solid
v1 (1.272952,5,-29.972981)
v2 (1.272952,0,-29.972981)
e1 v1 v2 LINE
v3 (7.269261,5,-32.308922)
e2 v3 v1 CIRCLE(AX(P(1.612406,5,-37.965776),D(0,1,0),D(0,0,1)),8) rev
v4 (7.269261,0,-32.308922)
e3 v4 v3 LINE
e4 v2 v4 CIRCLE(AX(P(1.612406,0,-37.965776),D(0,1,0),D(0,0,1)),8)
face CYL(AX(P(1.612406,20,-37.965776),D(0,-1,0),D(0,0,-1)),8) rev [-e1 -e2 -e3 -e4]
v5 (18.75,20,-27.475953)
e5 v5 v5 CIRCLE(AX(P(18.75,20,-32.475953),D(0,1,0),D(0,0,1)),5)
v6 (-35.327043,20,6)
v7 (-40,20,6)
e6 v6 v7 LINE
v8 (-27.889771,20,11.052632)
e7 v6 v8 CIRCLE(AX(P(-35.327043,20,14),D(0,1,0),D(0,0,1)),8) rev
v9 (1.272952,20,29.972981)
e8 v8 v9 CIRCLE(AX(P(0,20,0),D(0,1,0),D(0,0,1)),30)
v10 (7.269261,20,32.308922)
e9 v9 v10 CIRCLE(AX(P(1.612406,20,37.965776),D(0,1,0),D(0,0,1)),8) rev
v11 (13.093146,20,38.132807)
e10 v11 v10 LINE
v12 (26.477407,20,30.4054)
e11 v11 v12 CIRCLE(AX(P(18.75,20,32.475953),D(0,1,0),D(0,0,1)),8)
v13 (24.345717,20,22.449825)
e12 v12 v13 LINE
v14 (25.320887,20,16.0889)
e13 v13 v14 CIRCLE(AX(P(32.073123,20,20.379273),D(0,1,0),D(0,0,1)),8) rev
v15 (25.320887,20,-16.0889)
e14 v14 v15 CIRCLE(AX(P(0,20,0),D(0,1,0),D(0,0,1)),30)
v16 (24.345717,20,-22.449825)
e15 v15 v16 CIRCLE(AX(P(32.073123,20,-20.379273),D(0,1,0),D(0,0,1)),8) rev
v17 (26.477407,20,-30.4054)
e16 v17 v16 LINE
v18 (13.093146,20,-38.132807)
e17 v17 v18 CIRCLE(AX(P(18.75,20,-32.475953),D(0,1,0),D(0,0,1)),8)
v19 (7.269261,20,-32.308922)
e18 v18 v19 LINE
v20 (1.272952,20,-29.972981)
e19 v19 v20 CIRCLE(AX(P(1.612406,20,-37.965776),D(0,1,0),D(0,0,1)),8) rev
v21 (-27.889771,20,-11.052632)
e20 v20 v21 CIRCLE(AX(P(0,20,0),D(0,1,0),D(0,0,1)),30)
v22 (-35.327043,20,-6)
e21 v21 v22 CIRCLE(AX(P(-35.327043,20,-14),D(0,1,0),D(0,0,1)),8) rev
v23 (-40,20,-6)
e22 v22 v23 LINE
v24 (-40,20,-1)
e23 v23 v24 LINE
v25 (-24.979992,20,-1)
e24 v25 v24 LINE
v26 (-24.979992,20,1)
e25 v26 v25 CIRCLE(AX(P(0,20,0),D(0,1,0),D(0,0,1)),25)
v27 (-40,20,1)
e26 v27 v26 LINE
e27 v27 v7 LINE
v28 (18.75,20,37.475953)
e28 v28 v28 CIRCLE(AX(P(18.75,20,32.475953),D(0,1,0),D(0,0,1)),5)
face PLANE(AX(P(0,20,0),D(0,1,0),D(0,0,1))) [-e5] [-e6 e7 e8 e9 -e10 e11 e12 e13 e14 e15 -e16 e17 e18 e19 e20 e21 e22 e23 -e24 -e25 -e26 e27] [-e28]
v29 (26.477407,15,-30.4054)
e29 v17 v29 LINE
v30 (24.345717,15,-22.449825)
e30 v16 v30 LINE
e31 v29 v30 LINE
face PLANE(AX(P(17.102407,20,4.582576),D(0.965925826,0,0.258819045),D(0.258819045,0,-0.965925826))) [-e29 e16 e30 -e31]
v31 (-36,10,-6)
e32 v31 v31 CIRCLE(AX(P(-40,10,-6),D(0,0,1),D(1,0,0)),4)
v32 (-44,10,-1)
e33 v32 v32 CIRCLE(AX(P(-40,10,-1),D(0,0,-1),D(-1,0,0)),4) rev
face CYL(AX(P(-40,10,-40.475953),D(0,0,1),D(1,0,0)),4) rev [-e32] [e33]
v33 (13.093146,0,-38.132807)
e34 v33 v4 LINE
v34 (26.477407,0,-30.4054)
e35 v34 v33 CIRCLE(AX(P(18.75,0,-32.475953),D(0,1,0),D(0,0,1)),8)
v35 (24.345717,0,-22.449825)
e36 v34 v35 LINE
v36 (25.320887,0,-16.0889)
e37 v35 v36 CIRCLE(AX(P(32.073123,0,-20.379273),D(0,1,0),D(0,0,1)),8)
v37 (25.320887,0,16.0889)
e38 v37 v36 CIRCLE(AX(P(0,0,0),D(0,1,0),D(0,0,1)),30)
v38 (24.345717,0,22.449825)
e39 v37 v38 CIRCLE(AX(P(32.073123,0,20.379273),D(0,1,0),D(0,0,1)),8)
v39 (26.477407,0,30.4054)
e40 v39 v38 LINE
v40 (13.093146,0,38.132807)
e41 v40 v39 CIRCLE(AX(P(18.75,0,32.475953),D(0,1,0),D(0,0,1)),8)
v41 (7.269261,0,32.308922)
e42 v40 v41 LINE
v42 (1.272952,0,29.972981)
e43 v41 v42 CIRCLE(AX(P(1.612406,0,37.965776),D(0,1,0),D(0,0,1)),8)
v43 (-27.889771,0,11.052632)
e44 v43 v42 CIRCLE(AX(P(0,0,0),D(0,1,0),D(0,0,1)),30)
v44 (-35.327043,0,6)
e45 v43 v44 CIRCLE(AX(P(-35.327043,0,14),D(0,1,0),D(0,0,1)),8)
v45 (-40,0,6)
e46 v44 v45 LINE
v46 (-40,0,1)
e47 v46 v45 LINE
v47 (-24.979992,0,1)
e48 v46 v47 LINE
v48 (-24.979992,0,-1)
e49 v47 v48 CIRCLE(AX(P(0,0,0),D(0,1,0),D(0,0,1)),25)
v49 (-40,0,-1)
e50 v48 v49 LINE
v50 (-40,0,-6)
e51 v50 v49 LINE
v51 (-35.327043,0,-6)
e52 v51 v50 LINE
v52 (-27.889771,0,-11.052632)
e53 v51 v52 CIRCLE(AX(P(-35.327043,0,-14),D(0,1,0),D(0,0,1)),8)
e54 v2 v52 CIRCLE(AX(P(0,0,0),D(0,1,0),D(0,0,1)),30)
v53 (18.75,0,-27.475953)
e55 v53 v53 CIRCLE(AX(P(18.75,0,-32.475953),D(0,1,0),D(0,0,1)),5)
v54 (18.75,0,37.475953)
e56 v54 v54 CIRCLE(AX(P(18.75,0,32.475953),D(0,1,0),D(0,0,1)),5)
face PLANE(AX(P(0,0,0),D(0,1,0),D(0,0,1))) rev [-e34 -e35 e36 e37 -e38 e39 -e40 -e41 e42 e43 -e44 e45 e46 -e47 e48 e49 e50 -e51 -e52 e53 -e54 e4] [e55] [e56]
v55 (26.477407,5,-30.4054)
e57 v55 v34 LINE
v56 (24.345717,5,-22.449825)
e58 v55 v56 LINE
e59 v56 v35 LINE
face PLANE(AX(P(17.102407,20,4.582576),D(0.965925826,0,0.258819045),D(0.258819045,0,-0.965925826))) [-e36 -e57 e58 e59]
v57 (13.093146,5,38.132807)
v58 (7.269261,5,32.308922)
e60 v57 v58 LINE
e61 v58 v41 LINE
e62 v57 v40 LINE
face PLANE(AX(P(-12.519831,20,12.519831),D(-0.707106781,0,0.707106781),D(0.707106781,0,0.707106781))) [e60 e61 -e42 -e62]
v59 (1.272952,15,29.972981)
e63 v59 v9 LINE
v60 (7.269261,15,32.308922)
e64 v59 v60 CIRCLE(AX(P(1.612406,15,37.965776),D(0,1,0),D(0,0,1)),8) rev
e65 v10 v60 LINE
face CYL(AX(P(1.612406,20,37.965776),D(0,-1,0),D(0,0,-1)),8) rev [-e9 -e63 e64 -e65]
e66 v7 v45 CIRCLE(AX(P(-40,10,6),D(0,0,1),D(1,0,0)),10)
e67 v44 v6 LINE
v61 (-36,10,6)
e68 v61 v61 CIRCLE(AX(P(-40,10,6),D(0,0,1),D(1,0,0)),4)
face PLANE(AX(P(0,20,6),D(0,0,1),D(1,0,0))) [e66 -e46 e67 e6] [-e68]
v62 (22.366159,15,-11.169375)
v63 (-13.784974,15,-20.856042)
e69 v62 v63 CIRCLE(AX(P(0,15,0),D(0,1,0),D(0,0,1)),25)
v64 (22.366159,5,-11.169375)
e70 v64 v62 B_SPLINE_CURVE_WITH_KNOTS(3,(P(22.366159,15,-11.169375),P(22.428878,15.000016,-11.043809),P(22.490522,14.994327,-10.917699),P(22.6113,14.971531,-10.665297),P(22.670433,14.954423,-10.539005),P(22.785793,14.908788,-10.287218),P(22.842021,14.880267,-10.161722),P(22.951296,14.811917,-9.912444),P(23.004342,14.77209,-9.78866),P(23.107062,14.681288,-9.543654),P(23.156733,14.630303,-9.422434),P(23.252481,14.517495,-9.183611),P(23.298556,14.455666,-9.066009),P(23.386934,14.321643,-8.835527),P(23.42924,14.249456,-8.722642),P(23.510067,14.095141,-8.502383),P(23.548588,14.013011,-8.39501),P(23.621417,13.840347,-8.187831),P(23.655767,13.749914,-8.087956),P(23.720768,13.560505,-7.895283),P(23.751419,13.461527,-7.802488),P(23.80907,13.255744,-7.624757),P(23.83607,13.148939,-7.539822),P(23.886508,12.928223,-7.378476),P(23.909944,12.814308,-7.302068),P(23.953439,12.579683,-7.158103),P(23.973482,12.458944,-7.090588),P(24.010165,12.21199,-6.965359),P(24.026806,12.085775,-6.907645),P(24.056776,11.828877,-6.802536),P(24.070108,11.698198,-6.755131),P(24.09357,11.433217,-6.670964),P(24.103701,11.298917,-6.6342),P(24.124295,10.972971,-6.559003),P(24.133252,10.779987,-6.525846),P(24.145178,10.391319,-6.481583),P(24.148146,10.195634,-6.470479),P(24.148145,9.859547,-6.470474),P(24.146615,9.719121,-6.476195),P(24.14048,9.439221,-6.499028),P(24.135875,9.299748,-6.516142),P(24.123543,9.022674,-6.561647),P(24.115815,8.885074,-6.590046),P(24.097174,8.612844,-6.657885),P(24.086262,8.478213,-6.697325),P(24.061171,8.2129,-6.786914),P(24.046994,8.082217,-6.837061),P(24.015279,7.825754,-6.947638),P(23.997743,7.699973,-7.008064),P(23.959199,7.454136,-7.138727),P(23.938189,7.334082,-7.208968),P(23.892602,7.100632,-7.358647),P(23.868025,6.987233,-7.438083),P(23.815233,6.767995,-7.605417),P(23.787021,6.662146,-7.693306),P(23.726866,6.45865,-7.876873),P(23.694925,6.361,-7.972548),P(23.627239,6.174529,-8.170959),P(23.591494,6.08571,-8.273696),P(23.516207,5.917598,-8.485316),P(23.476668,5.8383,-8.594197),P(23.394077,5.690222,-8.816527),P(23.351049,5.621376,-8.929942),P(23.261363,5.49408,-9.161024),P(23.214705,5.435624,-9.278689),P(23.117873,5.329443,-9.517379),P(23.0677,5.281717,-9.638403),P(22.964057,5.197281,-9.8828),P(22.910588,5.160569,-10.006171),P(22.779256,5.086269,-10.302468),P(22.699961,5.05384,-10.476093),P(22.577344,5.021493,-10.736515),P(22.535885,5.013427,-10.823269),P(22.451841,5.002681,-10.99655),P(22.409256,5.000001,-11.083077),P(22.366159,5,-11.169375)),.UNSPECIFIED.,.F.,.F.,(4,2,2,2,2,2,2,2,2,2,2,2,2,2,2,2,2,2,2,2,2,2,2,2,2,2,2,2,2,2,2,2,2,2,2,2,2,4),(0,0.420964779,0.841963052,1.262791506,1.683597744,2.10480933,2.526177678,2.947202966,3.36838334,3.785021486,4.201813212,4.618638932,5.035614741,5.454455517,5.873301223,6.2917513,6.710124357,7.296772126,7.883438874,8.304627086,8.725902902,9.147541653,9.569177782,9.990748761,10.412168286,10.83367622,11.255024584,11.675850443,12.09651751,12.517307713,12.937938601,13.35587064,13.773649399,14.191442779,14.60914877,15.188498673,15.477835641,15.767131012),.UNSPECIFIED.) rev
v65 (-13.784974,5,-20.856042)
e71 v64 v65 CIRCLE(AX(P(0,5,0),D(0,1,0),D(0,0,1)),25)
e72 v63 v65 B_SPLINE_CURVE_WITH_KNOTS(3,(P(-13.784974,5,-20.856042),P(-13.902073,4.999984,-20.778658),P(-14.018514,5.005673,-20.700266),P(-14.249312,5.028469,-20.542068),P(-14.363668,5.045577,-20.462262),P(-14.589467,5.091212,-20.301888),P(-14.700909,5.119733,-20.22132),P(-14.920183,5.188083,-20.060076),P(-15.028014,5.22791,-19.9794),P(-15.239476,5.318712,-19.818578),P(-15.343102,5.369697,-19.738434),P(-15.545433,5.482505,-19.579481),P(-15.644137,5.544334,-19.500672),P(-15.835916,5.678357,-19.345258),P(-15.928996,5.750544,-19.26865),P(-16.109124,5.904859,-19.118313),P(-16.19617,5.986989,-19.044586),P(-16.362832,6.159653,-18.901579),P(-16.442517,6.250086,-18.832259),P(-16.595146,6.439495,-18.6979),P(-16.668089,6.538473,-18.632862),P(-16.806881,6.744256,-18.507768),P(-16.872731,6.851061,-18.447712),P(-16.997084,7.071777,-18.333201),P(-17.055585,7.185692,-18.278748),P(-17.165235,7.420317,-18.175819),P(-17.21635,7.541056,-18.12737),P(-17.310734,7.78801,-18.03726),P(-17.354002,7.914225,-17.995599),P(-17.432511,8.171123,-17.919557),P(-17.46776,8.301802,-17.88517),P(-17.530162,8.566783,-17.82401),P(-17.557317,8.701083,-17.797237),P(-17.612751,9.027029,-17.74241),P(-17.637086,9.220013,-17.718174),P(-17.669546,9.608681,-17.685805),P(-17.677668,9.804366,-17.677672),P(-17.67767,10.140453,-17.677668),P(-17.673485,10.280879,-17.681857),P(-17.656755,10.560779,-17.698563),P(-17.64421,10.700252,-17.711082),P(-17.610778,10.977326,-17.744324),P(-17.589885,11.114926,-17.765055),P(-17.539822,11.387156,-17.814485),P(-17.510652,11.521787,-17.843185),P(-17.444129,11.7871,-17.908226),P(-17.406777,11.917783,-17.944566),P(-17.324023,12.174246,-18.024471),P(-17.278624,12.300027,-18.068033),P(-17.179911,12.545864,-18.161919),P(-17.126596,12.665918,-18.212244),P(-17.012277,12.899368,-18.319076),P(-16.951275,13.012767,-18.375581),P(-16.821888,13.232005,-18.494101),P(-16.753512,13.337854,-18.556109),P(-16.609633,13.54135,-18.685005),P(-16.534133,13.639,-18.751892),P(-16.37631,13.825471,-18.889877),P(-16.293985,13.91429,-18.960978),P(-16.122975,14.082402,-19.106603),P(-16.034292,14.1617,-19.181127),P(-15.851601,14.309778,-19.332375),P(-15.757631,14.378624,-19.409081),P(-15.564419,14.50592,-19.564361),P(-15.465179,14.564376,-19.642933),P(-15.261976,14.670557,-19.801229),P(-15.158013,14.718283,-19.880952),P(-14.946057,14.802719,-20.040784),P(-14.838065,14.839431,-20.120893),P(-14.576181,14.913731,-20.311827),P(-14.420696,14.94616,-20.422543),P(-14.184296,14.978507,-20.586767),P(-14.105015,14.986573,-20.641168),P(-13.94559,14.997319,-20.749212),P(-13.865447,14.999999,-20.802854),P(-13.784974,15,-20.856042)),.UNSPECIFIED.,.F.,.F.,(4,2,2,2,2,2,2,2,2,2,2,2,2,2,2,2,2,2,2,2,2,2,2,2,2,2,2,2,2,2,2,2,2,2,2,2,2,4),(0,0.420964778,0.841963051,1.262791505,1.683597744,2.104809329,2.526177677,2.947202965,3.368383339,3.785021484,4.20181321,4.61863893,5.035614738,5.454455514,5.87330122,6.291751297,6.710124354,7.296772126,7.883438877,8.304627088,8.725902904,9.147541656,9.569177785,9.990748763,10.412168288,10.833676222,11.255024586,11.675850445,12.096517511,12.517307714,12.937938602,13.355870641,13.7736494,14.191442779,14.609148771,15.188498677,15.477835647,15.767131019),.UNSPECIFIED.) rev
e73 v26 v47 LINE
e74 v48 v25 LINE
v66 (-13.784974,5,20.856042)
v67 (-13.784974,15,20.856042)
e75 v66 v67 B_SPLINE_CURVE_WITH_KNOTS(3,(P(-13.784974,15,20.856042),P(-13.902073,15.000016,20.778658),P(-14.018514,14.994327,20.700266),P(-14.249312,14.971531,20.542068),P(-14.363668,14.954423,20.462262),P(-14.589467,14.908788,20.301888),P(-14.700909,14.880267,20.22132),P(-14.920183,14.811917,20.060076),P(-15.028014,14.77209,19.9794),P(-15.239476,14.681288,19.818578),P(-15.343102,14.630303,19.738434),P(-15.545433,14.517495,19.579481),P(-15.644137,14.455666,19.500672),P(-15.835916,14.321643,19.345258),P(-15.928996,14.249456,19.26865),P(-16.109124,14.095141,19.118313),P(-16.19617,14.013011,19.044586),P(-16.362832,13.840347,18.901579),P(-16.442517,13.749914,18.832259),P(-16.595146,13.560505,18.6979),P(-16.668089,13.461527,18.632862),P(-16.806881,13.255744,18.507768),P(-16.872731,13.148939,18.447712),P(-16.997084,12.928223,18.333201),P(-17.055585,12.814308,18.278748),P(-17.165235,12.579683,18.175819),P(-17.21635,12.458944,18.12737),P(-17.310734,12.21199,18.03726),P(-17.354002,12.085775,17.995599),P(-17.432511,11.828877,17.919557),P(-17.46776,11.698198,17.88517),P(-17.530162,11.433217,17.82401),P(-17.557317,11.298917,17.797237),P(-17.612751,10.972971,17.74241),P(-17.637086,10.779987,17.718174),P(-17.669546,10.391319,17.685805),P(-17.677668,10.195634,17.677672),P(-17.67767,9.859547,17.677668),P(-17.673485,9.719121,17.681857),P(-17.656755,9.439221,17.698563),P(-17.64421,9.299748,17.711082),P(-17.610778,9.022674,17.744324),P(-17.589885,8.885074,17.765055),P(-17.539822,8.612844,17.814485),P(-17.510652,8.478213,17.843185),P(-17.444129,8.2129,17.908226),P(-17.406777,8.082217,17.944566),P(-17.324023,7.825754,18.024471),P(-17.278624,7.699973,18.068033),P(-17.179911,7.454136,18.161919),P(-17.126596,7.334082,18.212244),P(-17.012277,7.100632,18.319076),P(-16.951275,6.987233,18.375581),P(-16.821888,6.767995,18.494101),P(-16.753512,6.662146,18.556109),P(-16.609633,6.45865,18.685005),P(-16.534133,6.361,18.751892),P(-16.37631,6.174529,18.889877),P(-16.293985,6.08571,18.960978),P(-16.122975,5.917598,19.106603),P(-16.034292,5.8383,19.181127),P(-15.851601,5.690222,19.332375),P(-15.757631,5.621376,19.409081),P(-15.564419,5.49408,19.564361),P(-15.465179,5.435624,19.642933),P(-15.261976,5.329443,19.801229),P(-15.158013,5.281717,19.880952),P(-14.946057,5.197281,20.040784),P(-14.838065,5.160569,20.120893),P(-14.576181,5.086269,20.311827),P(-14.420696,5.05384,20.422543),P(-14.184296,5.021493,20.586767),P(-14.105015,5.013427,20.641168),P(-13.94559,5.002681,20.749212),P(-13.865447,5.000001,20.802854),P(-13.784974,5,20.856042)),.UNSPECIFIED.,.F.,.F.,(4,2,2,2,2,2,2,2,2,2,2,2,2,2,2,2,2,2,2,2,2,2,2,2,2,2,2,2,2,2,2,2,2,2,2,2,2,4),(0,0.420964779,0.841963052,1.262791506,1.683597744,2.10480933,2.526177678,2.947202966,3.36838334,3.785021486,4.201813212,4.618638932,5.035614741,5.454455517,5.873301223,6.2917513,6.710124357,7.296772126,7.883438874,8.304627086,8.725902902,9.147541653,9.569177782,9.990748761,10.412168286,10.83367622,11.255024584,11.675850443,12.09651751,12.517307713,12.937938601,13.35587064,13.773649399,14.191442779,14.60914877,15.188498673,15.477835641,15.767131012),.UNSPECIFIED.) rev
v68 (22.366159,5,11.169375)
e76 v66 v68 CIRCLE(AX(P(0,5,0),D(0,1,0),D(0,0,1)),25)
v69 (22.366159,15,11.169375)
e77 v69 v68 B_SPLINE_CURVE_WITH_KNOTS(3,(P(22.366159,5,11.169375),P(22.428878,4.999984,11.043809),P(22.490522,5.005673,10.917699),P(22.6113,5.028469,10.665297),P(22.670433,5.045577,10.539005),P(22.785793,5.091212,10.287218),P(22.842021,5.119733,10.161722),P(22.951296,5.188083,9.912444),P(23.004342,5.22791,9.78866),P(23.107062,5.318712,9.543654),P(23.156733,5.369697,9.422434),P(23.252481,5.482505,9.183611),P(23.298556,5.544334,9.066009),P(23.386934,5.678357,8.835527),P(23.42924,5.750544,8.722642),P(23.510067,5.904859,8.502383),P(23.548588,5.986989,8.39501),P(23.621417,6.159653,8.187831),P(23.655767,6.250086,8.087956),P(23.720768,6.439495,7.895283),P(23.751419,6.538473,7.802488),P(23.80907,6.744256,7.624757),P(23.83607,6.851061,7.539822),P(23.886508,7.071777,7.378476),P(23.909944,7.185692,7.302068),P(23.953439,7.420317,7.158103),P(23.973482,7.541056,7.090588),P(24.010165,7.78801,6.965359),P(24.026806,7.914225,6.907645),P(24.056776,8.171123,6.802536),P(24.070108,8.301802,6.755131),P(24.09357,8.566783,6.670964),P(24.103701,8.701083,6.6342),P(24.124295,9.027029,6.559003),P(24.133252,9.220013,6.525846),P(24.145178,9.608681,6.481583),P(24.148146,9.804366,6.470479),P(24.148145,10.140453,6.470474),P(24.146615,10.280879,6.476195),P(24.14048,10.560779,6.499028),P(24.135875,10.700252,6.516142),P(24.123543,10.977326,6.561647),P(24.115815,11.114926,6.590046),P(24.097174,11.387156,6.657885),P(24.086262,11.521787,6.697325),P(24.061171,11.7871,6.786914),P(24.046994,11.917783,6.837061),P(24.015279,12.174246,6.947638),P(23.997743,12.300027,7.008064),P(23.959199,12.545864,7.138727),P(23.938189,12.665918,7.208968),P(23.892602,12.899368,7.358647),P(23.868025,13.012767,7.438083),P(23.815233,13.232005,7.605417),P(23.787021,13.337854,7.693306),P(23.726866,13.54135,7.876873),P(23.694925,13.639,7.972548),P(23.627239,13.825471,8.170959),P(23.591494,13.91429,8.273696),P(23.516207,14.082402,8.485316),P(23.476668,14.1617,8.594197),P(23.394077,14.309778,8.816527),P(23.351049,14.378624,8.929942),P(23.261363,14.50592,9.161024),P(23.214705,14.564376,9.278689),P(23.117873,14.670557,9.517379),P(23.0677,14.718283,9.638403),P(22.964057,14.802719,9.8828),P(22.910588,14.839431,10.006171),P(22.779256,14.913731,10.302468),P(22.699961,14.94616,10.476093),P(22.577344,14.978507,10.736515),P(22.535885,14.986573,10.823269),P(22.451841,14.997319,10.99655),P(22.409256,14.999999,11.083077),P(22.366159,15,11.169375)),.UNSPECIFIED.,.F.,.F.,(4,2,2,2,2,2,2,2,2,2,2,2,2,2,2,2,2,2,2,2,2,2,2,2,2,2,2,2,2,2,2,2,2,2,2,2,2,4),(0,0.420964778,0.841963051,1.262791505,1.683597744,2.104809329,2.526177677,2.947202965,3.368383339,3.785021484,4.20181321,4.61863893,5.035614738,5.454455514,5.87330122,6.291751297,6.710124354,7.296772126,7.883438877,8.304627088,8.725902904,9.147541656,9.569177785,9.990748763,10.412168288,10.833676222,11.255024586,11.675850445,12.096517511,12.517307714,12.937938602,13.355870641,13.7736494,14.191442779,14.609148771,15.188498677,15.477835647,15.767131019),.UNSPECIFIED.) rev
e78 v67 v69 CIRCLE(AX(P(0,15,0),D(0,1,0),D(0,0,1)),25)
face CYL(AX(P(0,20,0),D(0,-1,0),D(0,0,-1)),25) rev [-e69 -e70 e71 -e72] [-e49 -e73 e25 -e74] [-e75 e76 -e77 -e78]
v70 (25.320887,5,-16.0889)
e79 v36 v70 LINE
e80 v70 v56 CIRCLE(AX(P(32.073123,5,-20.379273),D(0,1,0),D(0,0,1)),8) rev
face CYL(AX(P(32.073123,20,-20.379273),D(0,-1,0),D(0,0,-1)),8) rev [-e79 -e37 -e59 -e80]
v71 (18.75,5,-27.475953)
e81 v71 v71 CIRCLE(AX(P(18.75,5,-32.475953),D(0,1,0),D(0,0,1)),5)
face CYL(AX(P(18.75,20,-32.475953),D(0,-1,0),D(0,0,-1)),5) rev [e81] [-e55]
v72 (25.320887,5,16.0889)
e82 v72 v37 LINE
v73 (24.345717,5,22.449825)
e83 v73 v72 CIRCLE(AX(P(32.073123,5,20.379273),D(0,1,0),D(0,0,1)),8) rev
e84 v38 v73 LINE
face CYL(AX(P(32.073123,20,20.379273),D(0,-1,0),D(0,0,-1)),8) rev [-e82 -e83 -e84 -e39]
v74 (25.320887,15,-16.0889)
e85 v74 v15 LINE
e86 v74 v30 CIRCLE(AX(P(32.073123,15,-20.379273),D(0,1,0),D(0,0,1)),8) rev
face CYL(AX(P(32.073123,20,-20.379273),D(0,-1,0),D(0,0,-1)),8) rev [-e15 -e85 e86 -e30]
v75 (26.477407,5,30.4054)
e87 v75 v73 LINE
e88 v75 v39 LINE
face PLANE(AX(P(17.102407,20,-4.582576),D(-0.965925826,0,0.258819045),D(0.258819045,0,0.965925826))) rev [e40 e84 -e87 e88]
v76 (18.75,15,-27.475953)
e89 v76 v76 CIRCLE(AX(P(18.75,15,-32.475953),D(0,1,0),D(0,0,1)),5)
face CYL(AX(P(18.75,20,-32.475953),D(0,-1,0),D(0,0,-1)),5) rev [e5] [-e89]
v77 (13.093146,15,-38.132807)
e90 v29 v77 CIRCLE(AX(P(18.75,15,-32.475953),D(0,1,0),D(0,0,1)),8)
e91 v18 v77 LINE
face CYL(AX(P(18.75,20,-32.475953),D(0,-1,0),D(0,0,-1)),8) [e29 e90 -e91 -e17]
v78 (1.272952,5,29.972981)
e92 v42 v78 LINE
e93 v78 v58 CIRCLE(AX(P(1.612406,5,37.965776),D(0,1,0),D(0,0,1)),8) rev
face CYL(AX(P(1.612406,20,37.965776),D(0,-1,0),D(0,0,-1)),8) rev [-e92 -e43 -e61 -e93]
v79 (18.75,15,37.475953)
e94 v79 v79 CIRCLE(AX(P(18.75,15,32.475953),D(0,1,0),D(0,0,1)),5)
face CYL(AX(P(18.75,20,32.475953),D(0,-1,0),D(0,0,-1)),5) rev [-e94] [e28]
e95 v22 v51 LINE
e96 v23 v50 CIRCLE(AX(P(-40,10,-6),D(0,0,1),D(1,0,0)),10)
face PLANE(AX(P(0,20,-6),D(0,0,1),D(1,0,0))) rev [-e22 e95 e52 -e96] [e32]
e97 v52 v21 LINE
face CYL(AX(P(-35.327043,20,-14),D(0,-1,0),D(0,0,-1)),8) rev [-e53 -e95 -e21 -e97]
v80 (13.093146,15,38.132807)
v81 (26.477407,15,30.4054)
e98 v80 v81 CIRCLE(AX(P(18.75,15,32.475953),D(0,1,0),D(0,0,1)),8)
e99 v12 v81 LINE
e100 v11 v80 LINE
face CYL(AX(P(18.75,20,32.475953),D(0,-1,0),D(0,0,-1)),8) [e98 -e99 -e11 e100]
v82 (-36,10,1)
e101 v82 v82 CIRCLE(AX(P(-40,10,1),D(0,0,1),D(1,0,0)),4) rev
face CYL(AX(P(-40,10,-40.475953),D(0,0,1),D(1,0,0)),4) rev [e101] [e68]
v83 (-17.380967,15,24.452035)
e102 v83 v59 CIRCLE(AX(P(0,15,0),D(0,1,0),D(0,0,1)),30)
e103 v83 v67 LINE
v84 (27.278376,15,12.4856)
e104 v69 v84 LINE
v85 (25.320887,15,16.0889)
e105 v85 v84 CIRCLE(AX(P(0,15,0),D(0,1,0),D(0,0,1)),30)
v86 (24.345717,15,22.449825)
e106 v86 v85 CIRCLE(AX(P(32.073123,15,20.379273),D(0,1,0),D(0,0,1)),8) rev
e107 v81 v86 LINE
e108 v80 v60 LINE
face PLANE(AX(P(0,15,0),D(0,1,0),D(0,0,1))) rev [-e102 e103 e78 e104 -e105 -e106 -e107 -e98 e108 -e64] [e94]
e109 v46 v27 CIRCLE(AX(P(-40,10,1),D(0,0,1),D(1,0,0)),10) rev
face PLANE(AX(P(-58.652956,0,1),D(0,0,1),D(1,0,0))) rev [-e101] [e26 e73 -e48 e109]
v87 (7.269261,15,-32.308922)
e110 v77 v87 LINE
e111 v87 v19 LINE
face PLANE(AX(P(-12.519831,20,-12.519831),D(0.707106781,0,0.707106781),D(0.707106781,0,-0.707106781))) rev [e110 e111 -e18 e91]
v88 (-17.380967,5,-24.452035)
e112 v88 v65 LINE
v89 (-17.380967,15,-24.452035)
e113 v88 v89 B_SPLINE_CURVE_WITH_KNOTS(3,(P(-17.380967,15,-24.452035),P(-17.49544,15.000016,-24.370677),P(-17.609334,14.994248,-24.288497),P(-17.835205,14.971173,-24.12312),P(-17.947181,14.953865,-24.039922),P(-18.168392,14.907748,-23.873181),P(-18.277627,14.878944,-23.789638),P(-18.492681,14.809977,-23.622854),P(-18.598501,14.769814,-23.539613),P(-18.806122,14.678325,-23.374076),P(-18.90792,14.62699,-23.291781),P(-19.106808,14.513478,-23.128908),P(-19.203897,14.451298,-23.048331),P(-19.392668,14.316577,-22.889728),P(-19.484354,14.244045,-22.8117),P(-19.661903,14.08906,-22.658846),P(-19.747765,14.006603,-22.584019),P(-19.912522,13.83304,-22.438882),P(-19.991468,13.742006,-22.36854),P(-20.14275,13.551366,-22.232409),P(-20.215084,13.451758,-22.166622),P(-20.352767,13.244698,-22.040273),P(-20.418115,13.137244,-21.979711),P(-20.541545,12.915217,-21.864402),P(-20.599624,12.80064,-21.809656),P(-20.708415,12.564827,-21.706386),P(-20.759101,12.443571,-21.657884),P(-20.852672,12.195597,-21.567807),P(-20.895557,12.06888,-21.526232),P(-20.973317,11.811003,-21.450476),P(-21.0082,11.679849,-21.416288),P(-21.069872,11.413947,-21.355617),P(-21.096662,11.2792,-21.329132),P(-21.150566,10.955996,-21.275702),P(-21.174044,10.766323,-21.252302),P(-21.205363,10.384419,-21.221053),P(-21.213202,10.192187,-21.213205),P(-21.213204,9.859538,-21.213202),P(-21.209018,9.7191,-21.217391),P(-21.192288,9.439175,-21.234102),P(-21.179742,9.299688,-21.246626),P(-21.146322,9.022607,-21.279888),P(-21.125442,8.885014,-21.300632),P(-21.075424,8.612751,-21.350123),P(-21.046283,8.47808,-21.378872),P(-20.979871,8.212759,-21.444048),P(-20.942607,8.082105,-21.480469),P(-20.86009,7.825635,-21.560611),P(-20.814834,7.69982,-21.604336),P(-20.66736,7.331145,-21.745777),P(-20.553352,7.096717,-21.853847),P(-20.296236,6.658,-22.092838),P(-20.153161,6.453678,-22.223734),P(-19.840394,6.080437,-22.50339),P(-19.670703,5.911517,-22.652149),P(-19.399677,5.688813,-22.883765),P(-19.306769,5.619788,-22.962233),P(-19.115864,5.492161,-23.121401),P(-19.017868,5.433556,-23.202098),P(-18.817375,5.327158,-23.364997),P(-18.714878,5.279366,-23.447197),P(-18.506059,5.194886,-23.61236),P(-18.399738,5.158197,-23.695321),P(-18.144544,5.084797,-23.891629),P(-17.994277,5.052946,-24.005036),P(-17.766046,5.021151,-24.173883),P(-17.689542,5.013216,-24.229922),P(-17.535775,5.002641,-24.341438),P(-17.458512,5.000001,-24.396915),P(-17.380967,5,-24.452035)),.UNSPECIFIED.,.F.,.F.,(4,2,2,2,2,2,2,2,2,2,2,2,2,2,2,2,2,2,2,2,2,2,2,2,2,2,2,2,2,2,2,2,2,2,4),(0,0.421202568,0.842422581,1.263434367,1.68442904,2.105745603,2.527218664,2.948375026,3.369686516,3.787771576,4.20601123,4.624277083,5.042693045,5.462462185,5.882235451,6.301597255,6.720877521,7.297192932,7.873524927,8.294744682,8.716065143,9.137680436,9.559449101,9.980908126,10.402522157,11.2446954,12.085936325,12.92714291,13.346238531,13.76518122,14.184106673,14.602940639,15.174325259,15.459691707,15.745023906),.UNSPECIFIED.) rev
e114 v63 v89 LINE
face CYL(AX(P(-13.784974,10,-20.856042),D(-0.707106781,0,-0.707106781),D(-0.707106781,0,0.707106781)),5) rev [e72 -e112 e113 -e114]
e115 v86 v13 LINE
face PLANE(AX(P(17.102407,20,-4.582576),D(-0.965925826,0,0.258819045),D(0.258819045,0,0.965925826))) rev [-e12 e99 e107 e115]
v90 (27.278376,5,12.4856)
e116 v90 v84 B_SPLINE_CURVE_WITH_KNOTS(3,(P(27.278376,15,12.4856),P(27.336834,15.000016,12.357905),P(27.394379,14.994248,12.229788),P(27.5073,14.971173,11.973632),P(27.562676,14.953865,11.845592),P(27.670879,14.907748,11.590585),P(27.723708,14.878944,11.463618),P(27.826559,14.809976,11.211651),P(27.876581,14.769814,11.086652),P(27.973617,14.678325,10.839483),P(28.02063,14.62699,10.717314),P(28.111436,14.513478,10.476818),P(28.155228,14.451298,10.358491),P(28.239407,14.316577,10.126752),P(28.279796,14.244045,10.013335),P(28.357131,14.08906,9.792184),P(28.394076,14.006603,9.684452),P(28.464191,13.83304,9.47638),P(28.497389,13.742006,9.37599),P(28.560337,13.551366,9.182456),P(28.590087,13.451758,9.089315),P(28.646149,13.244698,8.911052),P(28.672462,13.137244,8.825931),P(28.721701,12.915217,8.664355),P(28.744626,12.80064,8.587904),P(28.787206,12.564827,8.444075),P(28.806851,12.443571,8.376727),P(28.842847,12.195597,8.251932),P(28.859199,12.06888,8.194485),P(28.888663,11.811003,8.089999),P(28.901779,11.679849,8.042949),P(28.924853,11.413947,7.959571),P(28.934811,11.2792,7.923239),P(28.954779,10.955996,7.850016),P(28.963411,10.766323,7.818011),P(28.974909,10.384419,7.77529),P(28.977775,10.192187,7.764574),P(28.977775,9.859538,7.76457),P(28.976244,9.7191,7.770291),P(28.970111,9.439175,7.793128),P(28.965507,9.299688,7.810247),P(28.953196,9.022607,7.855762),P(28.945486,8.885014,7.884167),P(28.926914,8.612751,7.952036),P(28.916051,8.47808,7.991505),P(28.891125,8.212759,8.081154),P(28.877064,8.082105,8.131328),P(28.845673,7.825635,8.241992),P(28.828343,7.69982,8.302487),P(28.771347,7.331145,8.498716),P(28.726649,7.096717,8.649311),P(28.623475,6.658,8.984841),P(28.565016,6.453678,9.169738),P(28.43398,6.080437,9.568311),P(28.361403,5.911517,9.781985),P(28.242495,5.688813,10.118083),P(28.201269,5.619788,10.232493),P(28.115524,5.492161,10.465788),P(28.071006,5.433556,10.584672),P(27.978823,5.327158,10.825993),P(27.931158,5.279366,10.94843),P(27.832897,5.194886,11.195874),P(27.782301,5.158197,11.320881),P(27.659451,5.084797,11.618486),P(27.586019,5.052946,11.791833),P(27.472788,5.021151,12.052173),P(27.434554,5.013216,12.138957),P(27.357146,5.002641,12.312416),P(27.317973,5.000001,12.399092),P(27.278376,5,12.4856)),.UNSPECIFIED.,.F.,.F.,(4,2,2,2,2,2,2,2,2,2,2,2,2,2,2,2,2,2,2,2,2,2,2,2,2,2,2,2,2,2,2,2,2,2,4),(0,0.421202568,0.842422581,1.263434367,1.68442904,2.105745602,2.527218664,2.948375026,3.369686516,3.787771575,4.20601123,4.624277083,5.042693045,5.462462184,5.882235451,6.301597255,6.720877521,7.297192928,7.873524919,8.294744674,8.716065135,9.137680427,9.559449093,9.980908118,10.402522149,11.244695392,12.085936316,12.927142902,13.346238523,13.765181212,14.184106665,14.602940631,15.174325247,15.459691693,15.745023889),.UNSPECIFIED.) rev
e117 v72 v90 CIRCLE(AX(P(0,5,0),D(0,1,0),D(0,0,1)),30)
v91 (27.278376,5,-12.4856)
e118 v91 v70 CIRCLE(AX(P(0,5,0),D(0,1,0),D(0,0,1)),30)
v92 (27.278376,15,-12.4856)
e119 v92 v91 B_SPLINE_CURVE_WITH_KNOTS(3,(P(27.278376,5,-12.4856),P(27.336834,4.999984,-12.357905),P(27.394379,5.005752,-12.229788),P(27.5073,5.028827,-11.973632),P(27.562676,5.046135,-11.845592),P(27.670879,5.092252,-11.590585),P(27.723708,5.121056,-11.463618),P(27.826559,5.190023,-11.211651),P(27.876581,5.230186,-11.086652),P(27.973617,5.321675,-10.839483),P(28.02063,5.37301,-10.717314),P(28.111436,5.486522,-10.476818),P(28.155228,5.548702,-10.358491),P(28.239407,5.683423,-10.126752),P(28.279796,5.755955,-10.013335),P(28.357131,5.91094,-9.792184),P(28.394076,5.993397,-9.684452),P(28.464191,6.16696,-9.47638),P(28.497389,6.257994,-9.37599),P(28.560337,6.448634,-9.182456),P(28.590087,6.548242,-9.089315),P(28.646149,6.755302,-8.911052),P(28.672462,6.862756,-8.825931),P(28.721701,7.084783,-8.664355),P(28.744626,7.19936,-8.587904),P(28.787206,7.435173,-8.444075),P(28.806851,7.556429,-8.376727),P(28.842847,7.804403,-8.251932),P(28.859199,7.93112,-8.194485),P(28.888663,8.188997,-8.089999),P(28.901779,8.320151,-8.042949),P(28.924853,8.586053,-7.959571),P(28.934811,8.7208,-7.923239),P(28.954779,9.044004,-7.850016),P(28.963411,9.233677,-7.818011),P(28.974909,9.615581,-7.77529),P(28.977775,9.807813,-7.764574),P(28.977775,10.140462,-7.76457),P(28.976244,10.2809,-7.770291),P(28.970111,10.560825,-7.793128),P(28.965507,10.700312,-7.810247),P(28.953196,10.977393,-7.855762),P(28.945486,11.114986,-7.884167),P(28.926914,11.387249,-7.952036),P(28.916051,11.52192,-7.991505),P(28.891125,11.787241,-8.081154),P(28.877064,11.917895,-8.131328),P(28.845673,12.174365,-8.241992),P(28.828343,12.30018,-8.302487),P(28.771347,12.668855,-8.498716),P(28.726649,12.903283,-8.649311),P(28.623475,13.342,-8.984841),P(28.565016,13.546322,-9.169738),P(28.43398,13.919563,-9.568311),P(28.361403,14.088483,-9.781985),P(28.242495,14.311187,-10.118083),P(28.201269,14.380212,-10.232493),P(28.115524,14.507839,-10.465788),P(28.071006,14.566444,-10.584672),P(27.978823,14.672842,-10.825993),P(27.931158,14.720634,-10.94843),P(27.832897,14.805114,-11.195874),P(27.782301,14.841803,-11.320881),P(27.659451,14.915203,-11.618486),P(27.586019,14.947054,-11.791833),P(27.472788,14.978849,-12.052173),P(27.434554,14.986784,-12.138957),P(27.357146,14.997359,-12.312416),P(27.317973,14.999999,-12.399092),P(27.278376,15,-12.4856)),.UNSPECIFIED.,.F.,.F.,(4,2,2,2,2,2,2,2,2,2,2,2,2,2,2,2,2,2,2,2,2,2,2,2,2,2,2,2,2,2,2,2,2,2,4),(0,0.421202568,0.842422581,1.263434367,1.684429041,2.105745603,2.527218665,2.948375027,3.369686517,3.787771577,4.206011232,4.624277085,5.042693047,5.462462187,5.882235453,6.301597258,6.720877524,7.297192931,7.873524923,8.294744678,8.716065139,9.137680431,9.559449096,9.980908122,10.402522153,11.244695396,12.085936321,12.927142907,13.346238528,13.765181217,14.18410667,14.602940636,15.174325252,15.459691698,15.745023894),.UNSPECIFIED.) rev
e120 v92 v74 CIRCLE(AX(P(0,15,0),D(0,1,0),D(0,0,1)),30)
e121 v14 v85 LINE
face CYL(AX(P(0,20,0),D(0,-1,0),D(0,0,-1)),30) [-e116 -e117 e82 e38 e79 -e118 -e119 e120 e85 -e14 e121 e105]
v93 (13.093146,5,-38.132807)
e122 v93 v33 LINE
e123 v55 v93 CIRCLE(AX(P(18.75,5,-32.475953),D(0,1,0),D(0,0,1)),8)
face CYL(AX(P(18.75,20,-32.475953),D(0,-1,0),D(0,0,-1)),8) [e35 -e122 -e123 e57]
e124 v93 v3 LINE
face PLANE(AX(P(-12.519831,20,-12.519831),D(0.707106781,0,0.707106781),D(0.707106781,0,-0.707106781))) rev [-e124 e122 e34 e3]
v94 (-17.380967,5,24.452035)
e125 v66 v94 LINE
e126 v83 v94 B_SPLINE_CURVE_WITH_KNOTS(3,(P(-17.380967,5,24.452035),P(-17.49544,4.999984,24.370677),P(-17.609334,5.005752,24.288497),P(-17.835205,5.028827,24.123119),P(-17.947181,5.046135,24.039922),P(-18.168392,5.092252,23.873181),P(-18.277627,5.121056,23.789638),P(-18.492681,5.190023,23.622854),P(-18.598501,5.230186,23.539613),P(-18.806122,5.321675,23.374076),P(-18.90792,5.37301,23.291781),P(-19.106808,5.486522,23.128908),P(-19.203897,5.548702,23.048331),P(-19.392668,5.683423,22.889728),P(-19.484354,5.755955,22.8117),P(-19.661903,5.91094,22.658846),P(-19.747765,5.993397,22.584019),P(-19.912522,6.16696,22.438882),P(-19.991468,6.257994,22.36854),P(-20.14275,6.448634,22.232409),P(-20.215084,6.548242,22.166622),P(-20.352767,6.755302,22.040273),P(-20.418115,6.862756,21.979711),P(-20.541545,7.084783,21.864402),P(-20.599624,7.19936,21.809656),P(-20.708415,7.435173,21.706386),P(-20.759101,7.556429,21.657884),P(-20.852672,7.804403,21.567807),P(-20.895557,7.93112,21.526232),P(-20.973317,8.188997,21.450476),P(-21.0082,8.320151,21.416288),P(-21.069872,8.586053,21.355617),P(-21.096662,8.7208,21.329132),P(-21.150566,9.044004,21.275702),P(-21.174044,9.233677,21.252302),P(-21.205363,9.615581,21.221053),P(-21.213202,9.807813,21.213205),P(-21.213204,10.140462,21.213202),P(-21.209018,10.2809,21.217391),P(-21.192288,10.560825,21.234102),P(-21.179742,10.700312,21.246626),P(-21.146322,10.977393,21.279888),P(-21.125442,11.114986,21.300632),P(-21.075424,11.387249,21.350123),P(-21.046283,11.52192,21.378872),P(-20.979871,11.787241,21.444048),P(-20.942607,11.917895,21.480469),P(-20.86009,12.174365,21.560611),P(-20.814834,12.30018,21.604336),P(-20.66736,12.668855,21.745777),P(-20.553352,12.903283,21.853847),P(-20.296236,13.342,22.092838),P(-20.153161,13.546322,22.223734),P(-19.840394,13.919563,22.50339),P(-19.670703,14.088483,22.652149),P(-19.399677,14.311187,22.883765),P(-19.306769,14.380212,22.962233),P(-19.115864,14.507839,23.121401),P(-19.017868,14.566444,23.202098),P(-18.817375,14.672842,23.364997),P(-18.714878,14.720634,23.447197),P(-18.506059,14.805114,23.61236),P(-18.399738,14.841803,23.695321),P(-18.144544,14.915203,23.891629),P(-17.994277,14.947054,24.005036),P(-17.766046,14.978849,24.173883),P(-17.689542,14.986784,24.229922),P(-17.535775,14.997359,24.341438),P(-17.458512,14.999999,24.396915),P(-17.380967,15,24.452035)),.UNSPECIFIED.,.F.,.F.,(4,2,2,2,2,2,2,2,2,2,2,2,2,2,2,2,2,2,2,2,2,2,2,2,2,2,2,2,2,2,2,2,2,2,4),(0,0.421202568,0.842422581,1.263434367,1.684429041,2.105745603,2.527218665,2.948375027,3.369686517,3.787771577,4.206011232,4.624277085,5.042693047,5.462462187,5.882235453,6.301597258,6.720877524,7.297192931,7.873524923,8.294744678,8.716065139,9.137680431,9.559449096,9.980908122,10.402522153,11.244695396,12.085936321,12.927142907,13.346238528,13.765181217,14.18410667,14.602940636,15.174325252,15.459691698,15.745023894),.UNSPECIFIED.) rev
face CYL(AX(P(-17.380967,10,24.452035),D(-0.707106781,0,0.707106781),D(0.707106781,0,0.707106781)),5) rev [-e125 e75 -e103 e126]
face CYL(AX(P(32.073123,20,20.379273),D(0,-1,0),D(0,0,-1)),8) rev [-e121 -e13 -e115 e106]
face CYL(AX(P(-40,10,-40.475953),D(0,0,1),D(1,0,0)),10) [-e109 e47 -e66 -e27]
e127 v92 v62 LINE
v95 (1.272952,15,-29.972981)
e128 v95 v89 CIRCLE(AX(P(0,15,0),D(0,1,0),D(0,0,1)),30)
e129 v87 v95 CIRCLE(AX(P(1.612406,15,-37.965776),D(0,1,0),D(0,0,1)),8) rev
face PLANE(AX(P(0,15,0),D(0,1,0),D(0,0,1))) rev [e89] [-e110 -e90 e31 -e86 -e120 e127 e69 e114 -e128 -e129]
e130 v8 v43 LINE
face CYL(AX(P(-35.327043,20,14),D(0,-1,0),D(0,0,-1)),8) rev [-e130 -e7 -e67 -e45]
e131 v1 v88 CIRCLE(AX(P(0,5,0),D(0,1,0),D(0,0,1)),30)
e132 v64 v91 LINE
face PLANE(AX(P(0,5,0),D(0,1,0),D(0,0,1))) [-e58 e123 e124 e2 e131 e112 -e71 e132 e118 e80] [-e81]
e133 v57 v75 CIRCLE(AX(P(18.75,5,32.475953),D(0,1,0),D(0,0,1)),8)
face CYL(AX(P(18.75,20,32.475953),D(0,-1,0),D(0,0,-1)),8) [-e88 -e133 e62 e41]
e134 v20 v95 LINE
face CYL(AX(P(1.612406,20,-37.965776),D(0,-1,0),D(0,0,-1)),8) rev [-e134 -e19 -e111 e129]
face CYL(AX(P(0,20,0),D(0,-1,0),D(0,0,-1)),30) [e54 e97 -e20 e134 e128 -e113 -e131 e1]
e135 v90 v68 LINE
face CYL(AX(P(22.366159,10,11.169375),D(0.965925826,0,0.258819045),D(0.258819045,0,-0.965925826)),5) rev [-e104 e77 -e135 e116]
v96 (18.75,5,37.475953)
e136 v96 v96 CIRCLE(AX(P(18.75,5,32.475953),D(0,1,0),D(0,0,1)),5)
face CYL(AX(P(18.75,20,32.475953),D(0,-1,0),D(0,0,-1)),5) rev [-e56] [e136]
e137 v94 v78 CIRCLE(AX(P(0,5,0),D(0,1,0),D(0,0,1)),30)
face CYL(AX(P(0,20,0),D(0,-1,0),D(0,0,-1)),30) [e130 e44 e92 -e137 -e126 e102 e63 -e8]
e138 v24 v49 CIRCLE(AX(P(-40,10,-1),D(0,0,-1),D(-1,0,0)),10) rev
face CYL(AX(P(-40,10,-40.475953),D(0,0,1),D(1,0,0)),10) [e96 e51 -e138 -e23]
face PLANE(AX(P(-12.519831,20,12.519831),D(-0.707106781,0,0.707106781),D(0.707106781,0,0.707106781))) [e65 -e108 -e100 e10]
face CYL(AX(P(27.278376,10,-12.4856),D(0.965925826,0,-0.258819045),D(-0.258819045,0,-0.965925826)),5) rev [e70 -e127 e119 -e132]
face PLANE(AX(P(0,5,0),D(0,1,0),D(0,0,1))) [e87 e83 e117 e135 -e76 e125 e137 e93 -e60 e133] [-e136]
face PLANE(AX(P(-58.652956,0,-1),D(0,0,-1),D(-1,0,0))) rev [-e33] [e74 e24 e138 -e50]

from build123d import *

# Parameters (mm, degrees)
SKETCH1_R               = 5
SKETCH1_R_2             = 25
BOSS_EXTRUDE1_DEPTH     = 20
FILLET1_R               = 8
CUT_EXTRUDE4_START      = 5
CUT_EXTRUDE4_DEPTH      = 10
FILLET4_R               = 5
FILLET5_R               = 5
FILLET6_R               = 5
FILLET7_R               = 5
CUT_EXTRUDE5_DEPTH      = 68.366926205
CUT_EXTRUDE5_DEPTH_BACK = 68.366926205
SKETCH9_R               = 4
CUT_EXTRUDE6_DEPTH      = 68.366926205
CUT_EXTRUDE6_DEPTH_BACK = 68.366926205
SKETCH10_W              = 39.746236579
SKETCH10_H              = 2


with BuildPart() as part:
    # Sketch1 → Boss-Extrude1 (new body)
    with BuildSketch(Plane(origin=(0, 0, 0), x_dir=(1, 0, 0), z_dir=(0, 1, 0))):
        with BuildLine():
            ThreePointArc((13.093145751, -38.132806891), (22.75, -39.404155872), (26.47740661, -30.405400281))
            Line((26.47740661, -30.405400281), (23.370465731, -18.810139062))
            ThreePointArc((23.370465731, -18.810139062), (30, 0), (23.370465731, 18.810139062))
            Line((23.370465731, 18.810139062), (26.47740661, 30.405400281))
            ThreePointArc((26.47740661, 30.405400281), (22.75, 39.404155872), (13.093145751, 38.132806891))
            Line((13.093145751, 38.132806891), (4.604825411, 29.644486552))
            ThreePointArc((4.604825411, 29.644486552), (-17.128622381, 24.629459907), (-29.393876913, 6))
            Line((-29.393876913, 6), (-50, 6))
            Line((-50, 6), (-50, -6))
            Line((-50, -6), (-29.393876913, -6))
            ThreePointArc((-29.393876913, -6), (-17.128622381, -24.629459907), (4.604825411, -29.644486552))
            Line((4.604825411, -29.644486552), (13.093145751, -38.132806891))
        make_face()
        with Locations(Location((18.75, -32.475952642, 0), (0, 0, 270))):
            Circle(SKETCH1_R, mode=Mode.SUBTRACT)
        with Locations(Location((0, 0, 0), (0, 0, 270))):
            Circle(SKETCH1_R_2, mode=Mode.SUBTRACT)
        with Locations(Location((18.75, 32.475952642, 0), (0, 0, 270))):
            Circle(SKETCH1_R, mode=Mode.SUBTRACT)
    extrude(amount=BOSS_EXTRUDE1_DEPTH)

    # Fillet1
    fillet1_edges = [part.edges().sort_by_distance(p)[0] for p in [
        (23.370465731, 10, -18.810139062),
        (23.370465731, 10, 18.810139062),
        (4.604825411, 10, 29.644486552),
        (-29.393876913, 10, 6),
        (-29.393876913, 10, -6),
        (4.604825411, 10, -29.644486552),
    ]]
    fillet(fillet1_edges, radius=FILLET1_R)

    # Sketch8 → Cut-Extrude4 (cut)
    with BuildSketch(Plane(origin=(0, 0, 0), x_dir=(1, 0, 0), z_dir=(0, 1, 0)).offset(CUT_EXTRUDE4_START)):
        Polygon((0, 0), (112.790369841, -30.222088513), (-54.928380423, -54.928380423), align=None)
        Polygon((0, 0), (-54.928380423, 54.928380423), (112.790369841, 30.222088513), align=None)
    extrude(amount=CUT_EXTRUDE4_DEPTH, mode=Mode.SUBTRACT)

    # Fillet4
    fillet4_edges = [part.edges().sort_by_distance(p)[0] for p in [
        (-19.445436483, 5, 19.445436483),
        (-19.445436483, 15, 19.445436483),
    ]]
    fillet(fillet4_edges, radius=FILLET4_R - 0.0001)  # a hair under: the kernel refuses the full size

    # Fillet5
    fillet5_edges = [part.edges().sort_by_distance(p)[0] for p in [
        (26.562960223, 15, 7.11752374),
        (26.562960223, 5, 7.11752374),
    ]]
    fillet(fillet5_edges, radius=FILLET5_R - 0.0001)  # a hair under: the kernel refuses the full size

    # Fillet6
    fillet6_edges = [part.edges().sort_by_distance(p)[0] for p in [
        (26.562960223, 5, -7.11752374),
        (26.562960223, 15, -7.11752374),
    ]]
    fillet(fillet6_edges, radius=FILLET6_R - 0.0001)  # a hair under: the kernel refuses the full size

    # Fillet7
    fillet7_edges = [part.edges().sort_by_distance(p)[0] for p in [
        (-19.445436483, 15, -19.445436483),
        (-19.445436483, 5, -19.445436483),
    ]]
    fillet(fillet7_edges, radius=FILLET7_R - 0.0001)  # a hair under: the kernel refuses the full size

    # Sketch9 → Cut-Extrude5 (cut, two sides: drawn at the far end of the back side and taken through both)
    with BuildSketch(Plane.XY.offset(-CUT_EXTRUDE5_DEPTH_BACK)):
        with BuildLine():
            ThreePointArc((-50, 10), (-47.071067812, 17.071067812), (-40, 20))
            Line((-40, 20), (-50, 20))
            Line((-50, 20), (-50, 10))
        make_face()
        with BuildLine():
            ThreePointArc((-40, 0), (-47.071067812, 2.928932188), (-50, 10))
            Line((-50, 10), (-50, 0))
            Line((-50, 0), (-40, 0))
        make_face()
        with Locations((-40, 10)):
            Circle(SKETCH9_R)
    extrude(amount=CUT_EXTRUDE5_DEPTH + CUT_EXTRUDE5_DEPTH_BACK, mode=Mode.SUBTRACT)

    # Sketch10 → Cut-Extrude6 (cut, two sides: drawn at the far end of the back side and taken through both)
    with BuildSketch(Plane(origin=(0, 20, 0), x_dir=(1, 0, 0), z_dir=(0, 1, 0)).offset(-CUT_EXTRUDE6_DEPTH_BACK)):
        with Locations((-38.779837972, 0)):
            Rectangle(SKETCH10_W, SKETCH10_H)
    extrude(amount=CUT_EXTRUDE6_DEPTH + CUT_EXTRUDE6_DEPTH_BACK, mode=Mode.SUBTRACT)


solid = part.part
